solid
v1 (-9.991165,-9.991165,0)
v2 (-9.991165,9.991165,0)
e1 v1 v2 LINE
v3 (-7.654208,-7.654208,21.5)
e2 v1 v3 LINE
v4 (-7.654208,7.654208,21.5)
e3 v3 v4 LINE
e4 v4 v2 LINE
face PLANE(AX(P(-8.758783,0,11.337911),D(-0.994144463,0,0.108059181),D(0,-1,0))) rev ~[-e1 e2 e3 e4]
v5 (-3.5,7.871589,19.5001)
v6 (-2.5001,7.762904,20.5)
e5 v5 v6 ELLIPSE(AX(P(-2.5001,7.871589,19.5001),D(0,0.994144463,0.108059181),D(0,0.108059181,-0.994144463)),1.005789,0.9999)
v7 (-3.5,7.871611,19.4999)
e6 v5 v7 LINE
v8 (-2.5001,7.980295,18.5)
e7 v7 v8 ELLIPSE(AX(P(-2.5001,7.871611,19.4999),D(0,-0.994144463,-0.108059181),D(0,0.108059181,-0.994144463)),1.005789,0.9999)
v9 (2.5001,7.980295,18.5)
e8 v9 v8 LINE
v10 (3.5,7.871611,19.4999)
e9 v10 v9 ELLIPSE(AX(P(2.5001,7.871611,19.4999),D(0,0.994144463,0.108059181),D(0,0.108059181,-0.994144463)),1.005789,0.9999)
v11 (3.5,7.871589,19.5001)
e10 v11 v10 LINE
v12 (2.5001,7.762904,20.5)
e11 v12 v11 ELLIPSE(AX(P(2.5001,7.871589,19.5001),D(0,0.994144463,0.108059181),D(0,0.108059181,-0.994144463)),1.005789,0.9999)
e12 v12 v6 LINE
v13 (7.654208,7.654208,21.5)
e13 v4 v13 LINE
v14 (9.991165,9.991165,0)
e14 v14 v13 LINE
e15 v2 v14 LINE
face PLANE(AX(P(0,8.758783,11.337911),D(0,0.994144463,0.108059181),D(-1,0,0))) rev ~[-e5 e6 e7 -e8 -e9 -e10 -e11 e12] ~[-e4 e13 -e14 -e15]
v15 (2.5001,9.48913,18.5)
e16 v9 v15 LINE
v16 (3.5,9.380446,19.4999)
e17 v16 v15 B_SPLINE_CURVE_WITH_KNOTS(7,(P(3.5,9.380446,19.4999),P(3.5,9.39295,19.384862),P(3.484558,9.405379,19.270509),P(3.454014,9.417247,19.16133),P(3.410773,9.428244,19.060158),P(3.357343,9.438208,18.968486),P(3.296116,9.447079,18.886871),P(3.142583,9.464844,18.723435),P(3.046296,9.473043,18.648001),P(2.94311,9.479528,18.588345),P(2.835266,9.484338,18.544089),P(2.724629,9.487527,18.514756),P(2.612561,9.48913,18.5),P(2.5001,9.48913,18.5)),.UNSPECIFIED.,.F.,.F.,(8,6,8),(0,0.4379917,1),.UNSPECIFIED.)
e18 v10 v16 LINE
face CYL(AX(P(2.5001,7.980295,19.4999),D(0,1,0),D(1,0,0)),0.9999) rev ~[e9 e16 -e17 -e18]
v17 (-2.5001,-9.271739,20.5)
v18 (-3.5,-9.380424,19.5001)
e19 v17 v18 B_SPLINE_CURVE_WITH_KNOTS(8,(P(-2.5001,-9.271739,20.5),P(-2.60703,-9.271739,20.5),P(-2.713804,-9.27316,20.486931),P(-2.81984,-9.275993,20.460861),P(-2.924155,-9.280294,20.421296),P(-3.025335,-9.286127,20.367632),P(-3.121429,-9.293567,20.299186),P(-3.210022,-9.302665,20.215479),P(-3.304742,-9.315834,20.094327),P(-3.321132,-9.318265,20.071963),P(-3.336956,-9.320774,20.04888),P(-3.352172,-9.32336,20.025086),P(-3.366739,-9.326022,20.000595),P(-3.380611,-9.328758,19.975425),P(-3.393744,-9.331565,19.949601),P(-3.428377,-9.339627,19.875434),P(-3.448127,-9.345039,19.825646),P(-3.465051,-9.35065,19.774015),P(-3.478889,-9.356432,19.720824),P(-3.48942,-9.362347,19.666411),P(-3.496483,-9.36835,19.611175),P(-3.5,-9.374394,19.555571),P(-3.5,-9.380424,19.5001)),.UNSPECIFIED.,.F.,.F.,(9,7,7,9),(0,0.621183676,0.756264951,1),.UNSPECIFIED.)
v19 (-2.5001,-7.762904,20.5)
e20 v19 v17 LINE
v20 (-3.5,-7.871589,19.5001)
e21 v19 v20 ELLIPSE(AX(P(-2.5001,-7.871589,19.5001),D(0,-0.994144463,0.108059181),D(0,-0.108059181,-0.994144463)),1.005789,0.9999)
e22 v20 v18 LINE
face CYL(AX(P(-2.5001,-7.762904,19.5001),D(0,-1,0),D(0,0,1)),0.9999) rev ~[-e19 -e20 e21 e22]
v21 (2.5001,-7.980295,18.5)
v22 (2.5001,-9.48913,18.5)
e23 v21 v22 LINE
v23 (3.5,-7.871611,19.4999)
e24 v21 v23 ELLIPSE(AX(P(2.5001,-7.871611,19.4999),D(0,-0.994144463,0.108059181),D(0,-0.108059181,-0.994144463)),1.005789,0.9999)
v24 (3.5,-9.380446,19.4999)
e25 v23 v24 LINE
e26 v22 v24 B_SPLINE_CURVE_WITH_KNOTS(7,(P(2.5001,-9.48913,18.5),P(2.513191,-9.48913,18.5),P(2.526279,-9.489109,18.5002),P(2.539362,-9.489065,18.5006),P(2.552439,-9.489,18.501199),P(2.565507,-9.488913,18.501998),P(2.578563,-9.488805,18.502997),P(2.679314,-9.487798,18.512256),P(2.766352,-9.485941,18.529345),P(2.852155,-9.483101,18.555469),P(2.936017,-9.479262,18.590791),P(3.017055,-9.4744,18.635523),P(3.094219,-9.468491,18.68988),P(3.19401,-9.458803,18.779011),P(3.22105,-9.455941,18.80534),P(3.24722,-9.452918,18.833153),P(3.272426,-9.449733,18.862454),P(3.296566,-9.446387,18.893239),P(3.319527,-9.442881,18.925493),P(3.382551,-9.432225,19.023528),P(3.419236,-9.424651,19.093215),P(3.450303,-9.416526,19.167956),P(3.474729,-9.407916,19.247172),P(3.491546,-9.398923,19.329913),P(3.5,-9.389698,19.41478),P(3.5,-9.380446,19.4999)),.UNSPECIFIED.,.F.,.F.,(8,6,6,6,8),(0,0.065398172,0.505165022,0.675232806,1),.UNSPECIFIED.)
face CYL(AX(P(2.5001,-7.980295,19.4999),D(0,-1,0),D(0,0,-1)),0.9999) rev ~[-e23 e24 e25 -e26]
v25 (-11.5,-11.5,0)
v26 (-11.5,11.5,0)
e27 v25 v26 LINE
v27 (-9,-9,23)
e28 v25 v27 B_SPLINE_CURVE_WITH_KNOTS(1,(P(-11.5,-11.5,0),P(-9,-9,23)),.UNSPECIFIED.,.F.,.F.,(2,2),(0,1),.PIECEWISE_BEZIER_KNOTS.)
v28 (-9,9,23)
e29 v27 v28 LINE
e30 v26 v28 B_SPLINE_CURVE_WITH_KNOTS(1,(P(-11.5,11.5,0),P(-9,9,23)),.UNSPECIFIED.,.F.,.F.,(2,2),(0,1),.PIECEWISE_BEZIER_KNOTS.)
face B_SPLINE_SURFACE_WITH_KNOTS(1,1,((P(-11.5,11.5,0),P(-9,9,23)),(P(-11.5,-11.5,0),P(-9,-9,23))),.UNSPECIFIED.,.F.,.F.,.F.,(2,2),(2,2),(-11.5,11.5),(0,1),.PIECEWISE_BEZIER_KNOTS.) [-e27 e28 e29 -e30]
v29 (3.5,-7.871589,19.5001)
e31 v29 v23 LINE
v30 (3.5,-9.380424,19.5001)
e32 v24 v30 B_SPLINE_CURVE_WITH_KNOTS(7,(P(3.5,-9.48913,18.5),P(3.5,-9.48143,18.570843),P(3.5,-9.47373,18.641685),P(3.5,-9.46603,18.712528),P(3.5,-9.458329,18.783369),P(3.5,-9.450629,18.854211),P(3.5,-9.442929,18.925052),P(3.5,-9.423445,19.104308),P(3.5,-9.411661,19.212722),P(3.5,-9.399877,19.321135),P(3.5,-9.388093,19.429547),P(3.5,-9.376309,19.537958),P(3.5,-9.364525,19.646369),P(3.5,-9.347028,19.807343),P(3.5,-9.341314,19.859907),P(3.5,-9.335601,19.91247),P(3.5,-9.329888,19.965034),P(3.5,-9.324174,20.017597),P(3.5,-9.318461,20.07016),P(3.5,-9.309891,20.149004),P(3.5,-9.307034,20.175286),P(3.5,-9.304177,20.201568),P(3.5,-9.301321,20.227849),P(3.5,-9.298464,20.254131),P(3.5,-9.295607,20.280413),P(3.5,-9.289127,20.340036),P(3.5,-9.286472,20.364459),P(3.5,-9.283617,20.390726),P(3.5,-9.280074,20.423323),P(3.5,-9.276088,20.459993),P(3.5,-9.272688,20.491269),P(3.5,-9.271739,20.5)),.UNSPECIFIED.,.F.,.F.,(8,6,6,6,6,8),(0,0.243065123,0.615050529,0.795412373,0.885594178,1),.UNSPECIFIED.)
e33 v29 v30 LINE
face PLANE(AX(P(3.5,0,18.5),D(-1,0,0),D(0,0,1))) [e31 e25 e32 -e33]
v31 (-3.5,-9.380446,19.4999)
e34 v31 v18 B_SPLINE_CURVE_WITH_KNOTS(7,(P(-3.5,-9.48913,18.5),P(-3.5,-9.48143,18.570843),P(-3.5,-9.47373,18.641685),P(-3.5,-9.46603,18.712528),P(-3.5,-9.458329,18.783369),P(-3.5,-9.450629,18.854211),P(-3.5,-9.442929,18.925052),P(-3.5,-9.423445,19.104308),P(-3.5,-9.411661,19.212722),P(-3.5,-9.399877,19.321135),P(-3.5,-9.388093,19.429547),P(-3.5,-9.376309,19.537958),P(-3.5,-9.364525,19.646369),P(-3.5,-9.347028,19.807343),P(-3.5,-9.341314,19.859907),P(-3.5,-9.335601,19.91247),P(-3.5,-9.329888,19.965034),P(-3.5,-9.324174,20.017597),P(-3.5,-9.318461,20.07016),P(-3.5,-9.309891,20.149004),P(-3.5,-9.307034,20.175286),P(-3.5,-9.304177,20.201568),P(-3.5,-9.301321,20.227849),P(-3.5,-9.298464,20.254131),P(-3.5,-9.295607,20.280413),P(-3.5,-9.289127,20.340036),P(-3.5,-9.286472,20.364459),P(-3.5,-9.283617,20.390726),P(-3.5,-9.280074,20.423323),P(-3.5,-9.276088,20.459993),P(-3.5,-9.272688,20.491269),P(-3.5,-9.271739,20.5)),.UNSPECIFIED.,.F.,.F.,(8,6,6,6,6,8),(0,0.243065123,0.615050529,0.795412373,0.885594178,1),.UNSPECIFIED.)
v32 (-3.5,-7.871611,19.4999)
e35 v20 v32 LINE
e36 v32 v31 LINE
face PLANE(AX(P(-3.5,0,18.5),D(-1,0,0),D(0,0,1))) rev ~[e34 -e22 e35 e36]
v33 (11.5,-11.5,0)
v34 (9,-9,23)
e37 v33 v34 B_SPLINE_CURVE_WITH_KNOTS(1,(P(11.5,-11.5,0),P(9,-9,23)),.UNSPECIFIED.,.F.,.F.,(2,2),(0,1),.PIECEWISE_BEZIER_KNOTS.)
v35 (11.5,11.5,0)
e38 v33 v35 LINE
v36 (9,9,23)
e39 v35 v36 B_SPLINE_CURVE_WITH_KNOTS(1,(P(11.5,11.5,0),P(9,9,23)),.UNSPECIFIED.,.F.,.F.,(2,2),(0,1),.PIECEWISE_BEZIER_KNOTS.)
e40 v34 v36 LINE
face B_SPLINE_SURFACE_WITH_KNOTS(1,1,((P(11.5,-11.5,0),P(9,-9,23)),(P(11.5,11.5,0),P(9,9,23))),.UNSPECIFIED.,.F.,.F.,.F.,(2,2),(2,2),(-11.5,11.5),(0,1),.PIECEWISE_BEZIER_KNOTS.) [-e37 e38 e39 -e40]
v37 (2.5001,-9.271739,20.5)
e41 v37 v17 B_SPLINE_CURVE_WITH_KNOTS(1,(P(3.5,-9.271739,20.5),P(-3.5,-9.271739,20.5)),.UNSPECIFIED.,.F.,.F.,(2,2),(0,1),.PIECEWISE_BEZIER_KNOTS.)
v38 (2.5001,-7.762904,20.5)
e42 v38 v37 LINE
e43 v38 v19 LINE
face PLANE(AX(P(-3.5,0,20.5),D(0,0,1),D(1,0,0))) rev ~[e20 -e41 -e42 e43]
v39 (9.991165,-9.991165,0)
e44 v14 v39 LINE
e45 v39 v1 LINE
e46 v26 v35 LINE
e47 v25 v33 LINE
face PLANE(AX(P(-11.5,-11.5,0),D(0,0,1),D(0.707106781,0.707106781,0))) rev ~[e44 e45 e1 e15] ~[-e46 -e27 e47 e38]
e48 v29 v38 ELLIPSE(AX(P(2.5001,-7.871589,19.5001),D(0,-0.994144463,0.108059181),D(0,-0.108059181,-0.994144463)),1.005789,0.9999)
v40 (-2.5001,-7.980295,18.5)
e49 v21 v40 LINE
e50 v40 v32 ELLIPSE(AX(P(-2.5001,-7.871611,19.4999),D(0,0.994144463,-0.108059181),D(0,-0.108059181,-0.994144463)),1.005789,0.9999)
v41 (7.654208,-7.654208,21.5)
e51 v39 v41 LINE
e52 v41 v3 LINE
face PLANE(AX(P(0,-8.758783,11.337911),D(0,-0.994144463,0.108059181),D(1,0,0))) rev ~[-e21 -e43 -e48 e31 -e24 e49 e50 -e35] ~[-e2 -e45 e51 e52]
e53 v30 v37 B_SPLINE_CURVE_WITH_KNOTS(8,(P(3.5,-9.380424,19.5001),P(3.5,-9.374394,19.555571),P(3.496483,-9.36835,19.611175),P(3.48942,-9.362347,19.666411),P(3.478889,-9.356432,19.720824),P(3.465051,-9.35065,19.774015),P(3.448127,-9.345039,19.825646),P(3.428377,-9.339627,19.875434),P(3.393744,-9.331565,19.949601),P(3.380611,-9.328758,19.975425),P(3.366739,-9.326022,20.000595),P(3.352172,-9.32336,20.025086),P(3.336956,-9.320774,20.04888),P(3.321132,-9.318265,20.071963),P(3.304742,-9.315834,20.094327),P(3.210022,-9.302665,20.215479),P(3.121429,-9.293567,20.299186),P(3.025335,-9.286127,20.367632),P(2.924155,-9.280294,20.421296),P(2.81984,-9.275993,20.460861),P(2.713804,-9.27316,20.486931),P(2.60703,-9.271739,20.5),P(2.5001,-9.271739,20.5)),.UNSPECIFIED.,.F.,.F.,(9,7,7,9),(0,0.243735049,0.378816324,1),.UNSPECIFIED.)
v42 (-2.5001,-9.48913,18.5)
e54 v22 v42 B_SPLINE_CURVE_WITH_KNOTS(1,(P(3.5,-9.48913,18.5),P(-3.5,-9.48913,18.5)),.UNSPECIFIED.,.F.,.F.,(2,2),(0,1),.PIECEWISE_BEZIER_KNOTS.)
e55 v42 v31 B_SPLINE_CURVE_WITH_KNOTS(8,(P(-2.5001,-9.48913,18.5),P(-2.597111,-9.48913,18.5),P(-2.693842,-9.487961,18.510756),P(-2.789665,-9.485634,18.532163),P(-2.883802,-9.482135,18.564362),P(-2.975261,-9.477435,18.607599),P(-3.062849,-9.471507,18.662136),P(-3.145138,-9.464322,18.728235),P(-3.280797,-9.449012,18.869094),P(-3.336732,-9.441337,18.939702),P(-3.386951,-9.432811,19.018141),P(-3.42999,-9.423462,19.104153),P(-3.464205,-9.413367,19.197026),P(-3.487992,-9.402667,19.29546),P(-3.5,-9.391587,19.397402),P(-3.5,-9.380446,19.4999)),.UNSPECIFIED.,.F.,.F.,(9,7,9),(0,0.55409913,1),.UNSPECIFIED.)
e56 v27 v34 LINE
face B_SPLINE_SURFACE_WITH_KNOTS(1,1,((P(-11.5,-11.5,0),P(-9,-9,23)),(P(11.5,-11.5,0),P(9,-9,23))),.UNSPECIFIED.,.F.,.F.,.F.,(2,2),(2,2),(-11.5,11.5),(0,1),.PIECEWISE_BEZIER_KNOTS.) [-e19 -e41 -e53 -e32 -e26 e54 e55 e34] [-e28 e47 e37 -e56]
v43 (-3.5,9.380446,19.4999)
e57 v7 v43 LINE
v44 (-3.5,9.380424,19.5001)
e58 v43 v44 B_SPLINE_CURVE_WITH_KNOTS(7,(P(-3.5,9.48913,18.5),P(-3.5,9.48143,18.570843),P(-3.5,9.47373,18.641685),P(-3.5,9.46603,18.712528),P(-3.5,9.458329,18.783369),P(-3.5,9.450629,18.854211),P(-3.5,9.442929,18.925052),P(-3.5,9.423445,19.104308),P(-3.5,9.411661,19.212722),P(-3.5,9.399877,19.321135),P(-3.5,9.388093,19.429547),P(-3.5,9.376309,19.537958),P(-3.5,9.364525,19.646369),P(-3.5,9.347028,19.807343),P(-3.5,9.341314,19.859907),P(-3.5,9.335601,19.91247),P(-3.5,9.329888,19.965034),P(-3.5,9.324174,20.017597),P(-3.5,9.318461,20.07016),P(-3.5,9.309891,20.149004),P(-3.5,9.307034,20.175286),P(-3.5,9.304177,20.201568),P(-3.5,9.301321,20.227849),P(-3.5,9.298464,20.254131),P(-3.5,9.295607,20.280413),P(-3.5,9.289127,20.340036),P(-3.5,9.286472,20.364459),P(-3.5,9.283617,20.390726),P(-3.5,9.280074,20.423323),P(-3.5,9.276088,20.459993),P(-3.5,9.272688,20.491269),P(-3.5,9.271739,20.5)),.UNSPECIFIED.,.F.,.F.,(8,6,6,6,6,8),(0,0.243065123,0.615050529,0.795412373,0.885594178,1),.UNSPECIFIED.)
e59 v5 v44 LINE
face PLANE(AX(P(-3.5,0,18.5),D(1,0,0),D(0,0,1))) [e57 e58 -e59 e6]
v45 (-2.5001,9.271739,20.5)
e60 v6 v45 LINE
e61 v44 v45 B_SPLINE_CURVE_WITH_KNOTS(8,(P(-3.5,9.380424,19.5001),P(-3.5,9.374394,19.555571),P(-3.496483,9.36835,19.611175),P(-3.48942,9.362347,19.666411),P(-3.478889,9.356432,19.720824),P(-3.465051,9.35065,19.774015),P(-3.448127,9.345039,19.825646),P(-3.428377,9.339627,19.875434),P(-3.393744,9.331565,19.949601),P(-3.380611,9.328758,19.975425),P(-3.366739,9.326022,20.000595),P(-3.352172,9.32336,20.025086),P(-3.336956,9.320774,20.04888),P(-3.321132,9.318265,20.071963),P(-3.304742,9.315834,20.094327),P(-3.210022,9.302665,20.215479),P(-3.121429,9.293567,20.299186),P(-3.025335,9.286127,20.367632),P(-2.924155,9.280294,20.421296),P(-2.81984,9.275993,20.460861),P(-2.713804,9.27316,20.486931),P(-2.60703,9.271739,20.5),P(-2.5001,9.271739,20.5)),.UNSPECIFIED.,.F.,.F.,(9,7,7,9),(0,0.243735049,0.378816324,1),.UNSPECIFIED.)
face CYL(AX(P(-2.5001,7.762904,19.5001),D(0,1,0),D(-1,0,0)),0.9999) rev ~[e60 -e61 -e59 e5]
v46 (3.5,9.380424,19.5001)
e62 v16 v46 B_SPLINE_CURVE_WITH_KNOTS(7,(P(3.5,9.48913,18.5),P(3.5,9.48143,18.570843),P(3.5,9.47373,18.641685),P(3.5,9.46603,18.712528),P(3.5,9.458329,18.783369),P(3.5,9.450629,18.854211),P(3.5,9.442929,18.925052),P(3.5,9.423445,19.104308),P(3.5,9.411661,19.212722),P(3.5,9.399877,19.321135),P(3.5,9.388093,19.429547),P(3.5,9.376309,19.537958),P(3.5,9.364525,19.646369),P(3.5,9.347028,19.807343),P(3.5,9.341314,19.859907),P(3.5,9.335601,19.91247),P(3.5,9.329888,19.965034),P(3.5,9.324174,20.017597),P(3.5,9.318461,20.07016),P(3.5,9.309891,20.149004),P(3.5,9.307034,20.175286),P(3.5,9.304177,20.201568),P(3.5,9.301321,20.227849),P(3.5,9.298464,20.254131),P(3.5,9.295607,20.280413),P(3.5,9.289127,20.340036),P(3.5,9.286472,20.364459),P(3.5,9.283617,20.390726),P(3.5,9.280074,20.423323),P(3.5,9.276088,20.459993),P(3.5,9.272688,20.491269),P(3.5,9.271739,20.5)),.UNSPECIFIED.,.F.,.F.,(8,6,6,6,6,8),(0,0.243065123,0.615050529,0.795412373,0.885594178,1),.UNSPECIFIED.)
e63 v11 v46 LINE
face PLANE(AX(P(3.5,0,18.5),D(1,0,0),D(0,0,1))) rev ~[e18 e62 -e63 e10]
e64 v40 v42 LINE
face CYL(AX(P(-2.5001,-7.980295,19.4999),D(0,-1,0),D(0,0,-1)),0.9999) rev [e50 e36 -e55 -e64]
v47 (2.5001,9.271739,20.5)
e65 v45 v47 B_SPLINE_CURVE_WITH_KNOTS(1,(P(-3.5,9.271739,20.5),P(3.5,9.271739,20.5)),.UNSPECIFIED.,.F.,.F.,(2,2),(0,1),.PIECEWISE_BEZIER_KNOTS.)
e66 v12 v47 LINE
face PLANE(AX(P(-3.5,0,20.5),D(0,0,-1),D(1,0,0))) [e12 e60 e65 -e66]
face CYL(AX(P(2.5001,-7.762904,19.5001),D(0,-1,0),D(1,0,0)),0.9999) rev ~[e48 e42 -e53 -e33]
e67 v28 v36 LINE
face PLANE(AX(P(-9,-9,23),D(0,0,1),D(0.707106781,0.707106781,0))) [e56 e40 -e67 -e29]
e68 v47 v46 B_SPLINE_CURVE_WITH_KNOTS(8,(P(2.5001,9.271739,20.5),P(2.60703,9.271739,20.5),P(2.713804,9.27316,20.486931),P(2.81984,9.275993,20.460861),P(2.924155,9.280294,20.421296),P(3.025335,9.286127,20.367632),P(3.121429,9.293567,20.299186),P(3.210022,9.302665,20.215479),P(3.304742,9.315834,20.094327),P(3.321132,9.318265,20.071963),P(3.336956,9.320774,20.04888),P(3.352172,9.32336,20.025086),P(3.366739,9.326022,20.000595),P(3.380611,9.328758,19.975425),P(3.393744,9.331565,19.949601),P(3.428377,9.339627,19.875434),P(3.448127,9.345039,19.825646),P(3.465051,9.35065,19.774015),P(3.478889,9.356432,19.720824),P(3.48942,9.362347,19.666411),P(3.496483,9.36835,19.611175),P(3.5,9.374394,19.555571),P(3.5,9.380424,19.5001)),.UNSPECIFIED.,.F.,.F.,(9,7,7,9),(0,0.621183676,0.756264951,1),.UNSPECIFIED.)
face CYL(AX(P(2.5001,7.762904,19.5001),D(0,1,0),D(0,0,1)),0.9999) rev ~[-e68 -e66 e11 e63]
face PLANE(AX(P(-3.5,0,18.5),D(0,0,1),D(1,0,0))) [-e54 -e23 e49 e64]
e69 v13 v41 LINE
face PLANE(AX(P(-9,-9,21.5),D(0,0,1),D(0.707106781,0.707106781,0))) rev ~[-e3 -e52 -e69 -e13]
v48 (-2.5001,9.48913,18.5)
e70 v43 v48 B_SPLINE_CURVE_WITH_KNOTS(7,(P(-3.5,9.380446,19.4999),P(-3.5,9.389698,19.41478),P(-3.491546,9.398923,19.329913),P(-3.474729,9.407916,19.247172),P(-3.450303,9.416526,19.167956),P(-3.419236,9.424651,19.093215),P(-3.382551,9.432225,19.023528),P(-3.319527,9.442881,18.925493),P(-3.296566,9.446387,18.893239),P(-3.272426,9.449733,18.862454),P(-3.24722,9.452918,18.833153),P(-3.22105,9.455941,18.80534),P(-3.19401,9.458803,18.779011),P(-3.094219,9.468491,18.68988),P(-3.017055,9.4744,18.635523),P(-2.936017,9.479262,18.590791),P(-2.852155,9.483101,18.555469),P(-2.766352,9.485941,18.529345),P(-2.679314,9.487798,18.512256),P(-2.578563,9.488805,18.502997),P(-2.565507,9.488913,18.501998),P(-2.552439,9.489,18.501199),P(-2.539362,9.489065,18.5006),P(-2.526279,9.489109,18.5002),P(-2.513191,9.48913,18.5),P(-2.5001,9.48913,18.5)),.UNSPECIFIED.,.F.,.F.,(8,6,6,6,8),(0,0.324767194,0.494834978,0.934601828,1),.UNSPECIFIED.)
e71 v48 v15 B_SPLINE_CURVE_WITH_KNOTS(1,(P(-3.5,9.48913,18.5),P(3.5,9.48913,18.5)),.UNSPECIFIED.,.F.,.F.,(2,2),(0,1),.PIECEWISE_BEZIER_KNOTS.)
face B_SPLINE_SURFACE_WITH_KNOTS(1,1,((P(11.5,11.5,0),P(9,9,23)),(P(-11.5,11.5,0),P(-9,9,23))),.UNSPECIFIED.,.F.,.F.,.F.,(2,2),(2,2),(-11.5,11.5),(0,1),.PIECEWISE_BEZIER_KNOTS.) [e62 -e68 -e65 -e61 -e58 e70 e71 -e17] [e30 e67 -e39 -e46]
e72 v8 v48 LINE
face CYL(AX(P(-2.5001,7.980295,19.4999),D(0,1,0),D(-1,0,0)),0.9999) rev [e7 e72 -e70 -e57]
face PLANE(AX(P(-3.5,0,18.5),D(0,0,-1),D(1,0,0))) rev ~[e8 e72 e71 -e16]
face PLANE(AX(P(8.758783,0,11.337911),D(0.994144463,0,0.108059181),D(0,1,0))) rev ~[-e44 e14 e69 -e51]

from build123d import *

# Parameters (mm, degrees)
F1_W          = 23
F1_H          = 23
F2_W          = 18
F2_H          = 18
F4_T          = -1.5
F5_W          = 7
F5_H          = 2
F6_DEPTH      = 11.5010001
F6_DEPTH_BACK = 11.5010001
F7_R          = 0.9999


# Not quite as in the source:
# - a fillet or chamfer is up to 0.001 mm smaller than in the source, because OpenCascade refuses the exact size


with BuildPart() as f3:
    # F1 (on Top) → F3 section 0
    with BuildSketch(Plane.XY):
        Rectangle(F1_W, F1_H)
    # F2 (on offset) → F3 section 1
    with BuildSketch(Plane.XY.offset(23)):
        Rectangle(F2_W, F2_H)
    loft()

    # F4
    f4_openings = [f3.faces().sort_by_distance(p)[0] for p in [
        (0, 0, 0),
    ]]
    offset(amount=F4_T, openings=f4_openings)

    # F5 (on Front) → F6 (cut, two sides)
    with BuildSketch(Plane.XZ) as f6_sk:
        with Locations((0, 19.5)):
            Rectangle(F5_W, F5_H)
    extrude(amount=-F6_DEPTH, mode=Mode.SUBTRACT)
    extrude(f6_sk.sketch, amount=F6_DEPTH_BACK, mode=Mode.SUBTRACT)

    # F7 (radius 1 in the source; OpenCascade refuses exactly that, so slightly less here)
    f7_edges = [f3.edges().sort_by_distance(p)[0] for p in [
        (-3.5, 8.517322, 20.5),
        (-3.5, -8.517322, 20.5),
        (-3.5, 8.734713, 18.5),
        (-3.5, -8.734713, 18.5),
        (3.5, 8.734713, 18.5),
        (3.5, -8.734713, 18.5),
        (3.5, 8.517322, 20.5),
        (3.5, -8.517322, 20.5),
    ]]
    fillet(f7_edges, radius=F7_R)


solid = f3.part
